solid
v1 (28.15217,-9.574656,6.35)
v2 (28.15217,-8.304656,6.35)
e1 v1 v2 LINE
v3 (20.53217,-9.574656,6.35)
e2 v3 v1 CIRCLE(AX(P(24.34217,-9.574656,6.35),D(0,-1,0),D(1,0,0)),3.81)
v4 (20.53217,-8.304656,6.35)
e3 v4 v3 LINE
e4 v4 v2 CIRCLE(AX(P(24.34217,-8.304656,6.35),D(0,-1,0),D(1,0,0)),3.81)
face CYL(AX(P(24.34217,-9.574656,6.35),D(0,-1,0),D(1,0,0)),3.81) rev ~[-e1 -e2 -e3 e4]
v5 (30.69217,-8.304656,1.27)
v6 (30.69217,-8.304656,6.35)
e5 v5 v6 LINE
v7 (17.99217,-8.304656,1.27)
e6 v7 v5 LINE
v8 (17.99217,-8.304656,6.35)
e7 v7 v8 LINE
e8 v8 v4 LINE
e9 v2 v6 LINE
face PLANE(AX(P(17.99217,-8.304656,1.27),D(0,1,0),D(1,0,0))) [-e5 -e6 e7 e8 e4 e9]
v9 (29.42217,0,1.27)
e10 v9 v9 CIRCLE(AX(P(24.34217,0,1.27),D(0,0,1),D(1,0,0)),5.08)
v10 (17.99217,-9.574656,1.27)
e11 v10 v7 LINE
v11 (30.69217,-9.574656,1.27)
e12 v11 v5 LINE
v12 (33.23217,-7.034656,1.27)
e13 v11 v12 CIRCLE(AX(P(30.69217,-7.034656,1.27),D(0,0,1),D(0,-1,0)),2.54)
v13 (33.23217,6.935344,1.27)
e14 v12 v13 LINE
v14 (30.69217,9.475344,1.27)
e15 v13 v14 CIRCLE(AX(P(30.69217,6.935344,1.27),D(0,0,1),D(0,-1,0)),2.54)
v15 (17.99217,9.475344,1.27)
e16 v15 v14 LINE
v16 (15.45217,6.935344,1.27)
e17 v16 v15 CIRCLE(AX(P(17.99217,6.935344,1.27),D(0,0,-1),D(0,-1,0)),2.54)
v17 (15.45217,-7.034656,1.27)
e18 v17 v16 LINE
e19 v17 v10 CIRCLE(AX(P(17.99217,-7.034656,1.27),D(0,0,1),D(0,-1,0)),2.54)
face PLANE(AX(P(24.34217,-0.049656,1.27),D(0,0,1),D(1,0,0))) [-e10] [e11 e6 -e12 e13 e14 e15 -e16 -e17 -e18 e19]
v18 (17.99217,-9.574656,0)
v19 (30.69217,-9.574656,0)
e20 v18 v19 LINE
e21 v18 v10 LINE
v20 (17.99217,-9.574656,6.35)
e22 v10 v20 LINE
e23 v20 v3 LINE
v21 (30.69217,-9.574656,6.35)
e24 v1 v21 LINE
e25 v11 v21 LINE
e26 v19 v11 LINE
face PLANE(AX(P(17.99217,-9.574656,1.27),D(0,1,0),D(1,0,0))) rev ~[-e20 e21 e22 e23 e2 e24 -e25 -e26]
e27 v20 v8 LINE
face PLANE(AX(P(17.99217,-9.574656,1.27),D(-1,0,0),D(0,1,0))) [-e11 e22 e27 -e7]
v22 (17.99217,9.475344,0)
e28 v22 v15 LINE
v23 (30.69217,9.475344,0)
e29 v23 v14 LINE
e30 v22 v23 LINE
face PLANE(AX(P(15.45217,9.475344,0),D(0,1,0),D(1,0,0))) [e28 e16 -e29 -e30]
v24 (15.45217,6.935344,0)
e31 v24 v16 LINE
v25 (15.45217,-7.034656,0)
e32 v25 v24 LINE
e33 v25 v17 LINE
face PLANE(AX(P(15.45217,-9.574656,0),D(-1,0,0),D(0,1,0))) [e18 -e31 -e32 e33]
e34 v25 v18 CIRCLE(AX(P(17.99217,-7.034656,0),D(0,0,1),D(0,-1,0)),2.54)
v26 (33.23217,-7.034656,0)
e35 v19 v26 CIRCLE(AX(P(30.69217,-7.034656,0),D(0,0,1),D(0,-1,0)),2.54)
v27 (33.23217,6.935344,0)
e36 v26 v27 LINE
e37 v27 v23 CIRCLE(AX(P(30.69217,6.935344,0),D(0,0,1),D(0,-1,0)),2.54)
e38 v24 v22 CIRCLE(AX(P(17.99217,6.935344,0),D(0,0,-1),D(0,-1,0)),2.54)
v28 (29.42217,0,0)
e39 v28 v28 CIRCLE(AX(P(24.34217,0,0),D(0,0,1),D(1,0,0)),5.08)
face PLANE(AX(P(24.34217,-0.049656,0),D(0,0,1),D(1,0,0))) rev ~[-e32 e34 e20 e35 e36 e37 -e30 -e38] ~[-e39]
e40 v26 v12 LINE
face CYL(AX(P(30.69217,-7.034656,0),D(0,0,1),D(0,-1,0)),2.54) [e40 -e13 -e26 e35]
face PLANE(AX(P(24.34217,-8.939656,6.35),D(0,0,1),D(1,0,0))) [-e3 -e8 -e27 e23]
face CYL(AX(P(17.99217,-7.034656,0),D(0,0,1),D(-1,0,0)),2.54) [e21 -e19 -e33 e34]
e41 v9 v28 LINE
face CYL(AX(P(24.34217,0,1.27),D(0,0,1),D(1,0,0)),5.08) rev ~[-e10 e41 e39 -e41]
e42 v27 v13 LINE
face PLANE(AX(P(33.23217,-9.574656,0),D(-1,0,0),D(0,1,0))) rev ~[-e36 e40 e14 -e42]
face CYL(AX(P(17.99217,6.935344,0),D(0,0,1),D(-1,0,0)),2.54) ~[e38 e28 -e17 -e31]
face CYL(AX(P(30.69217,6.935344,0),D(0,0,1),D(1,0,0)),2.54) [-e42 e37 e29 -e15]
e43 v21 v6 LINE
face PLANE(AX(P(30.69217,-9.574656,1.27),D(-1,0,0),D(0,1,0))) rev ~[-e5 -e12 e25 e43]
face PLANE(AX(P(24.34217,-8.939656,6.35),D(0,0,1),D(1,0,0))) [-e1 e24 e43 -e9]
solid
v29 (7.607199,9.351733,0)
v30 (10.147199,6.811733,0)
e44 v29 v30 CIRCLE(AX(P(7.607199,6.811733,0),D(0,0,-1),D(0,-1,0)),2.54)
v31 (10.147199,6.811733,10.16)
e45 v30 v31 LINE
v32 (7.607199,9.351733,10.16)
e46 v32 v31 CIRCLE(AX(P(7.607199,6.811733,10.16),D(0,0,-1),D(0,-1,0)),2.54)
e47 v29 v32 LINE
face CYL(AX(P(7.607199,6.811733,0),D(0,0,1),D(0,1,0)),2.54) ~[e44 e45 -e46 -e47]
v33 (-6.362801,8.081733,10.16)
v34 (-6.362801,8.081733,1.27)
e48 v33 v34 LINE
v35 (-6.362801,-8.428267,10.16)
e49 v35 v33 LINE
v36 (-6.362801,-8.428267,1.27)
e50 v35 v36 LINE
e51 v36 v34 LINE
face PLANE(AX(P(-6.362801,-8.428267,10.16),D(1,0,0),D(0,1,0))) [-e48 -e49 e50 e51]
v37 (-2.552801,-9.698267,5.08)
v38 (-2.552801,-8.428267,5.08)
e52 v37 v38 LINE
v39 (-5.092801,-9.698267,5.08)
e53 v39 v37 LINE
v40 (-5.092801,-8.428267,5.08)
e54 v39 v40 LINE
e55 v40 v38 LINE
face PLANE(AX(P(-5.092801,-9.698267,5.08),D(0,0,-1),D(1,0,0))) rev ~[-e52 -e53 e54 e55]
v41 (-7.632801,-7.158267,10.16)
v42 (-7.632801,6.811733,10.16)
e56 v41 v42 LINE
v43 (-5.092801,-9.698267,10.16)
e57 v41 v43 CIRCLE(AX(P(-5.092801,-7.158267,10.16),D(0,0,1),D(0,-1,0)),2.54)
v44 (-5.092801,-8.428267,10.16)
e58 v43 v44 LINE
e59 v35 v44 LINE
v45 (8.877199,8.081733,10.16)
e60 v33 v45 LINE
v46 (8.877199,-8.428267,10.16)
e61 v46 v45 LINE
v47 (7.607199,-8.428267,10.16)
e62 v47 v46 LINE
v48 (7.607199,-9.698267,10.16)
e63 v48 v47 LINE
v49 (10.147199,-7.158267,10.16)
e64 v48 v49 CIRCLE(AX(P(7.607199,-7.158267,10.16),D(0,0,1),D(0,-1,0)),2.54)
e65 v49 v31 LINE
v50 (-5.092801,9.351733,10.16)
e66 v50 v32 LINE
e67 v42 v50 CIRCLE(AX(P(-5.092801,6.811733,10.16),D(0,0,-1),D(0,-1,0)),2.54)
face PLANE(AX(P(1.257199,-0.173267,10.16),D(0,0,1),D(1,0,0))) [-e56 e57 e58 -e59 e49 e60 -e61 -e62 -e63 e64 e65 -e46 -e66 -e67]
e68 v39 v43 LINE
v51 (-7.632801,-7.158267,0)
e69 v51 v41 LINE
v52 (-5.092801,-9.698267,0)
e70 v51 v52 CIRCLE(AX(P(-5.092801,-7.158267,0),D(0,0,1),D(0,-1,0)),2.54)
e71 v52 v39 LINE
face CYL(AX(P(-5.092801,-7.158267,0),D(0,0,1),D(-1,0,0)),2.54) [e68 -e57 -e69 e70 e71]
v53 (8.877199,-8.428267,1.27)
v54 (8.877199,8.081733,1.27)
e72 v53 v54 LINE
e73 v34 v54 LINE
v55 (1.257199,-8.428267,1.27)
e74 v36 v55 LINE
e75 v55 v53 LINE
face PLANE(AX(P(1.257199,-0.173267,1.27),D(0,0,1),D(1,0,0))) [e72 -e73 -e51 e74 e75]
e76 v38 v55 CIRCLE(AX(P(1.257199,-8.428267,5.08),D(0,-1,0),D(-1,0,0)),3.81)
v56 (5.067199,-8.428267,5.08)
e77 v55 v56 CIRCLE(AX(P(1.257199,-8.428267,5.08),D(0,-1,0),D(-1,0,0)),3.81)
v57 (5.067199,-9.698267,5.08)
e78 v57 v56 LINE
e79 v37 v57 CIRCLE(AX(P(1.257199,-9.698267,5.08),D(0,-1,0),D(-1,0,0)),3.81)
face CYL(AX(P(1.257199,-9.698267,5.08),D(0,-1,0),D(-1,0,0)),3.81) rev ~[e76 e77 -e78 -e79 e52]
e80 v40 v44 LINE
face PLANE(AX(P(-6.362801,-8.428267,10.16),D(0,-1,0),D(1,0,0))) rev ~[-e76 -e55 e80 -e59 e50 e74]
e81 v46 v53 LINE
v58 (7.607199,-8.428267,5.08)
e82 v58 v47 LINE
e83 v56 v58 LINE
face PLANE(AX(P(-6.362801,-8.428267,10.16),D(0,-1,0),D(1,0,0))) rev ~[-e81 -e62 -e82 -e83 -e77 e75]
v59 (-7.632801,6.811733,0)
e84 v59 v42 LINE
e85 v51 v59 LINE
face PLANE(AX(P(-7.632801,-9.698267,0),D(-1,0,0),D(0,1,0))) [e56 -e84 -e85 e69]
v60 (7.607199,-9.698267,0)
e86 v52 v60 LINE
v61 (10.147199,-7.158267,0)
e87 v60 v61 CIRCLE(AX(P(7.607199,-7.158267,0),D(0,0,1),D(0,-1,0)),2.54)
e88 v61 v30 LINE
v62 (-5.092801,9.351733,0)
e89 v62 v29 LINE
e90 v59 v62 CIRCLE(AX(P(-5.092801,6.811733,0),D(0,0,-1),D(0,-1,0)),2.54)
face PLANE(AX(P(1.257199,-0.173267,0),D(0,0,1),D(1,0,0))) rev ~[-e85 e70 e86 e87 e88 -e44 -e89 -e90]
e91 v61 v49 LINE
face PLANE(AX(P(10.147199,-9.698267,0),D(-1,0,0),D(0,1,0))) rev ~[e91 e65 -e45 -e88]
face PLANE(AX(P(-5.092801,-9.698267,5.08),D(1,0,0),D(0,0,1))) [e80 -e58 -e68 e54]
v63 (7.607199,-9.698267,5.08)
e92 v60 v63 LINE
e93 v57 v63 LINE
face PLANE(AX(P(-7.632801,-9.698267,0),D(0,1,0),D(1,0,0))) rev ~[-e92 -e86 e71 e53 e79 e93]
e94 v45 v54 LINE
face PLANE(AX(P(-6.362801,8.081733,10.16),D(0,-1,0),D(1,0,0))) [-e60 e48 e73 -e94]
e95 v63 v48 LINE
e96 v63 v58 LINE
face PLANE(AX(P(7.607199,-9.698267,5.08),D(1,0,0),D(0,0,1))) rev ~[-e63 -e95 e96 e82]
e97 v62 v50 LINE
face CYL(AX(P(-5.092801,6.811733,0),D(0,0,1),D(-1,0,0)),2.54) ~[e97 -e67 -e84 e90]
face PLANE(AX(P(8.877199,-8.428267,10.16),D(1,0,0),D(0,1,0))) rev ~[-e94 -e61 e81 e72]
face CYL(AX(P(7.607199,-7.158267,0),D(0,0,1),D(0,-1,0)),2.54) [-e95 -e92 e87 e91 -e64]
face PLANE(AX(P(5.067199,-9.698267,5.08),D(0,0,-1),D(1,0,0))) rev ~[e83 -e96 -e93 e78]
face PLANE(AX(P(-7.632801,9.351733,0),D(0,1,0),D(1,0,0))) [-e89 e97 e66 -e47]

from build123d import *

# Parameters (mm, degrees)
F0_W      = 17.78
F0_H      = 19.05
F1_DEPTH  = 10.16
F2_W      = 15.24
F2_H      = 16.51
F3_DEPTH  = 8.89
F4_R      = 2.54
F5_W      = 2.54
F5_H      = 5.08
F6_DEPTH  = 1.27
F7_W      = 17.78
F7_H      = 19.05
F8_DEPTH  = 1.27
F9_R      = 2.54
F10_W     = 12.7
F10_H     = 1.27
F11_DEPTH = 5.08
F12_R     = 3.81
F13_DEPTH = 1.27
F14_R     = 5.08
F15_DEPTH = 1.27


# Not quite as in the source:
# - a feature names something its author has since deleted; it is built from what else it names


with BuildPart() as f1:
    # F0 (on Top) → F1 (new body)
    with BuildSketch(Plane.XY):
        with Locations((1.2571994369, -0.1732670812)):
            Rectangle(F0_W, F0_H)
    extrude(amount=F1_DEPTH)

    # F2 (on face) → F3 (cut)
    with BuildSketch(Plane.XY.offset(10.16)):
        with Locations((1.2571994369, -0.1732670812)):
            Rectangle(F2_W, F2_H)
    extrude(amount=-F3_DEPTH, mode=Mode.SUBTRACT)

    # F4
    f4_edges = [f1.edges().sort_by_distance(p)[0] for p in [
        (10.147199, 9.351733, 5.08),
        (-7.632801, 9.351733, 5.08),
        (-7.632801, -9.698267, 5.08),
        (10.147199, -9.698267, 5.08),
    ]]
    fillet(f4_edges, radius=F4_R)

    # F5 (on face) → F6 (cut)
    with BuildSketch(Plane.XZ.offset(9.6982670812)):
        with BuildLine():
            ThreePointArc((-2.5528005631, 5.08), (1.2571994369, 1.27), (5.0671994369, 5.08))
            ThreePointArc((5.0671994369, 5.08), (1.2571994369, 8.89), (-2.5528005631, 5.08))
        make_face()
        with Locations((-3.8228005631, 7.62)):
            Rectangle(F5_W, F5_H)
        with Locations((6.3371994369, 7.62)):
            Rectangle(F5_W, F5_H)
        with BuildLine():
            ThreePointArc((-2.5528005631, 5.08), (1.2571994369, 8.89), (5.0671994369, 5.08))
            Line((5.0671994369, 5.08), (5.0671994369, 10.16))
            Line((5.0671994369, 10.16), (-2.5528005631, 10.16))
            Line((-2.5528005631, 10.16), (-2.5528005631, 5.08))
        make_face()
    extrude(amount=-F6_DEPTH, mode=Mode.SUBTRACT)


with BuildPart() as f8:
    # F7 (on Top) → F8 (new body)
    with BuildSketch(Plane.XY):
        with Locations((24.3421698132, -0.0496563748)):
            Rectangle(F7_W, F7_H)
    extrude(amount=F8_DEPTH)

    # F9
    f9_edges = [f8.edges().sort_by_distance(p)[0] for p in [
        (15.45217, -9.574656, 0.635),
        (33.23217, -9.574656, 0.635),
        (33.23217, 9.475344, 0.635),
        (15.45217, 9.475344, 0.635),
    ]]
    fillet(f9_edges, radius=F9_R)

    # F10 (on face) → F11 (join)
    with BuildSketch(Plane.XY.offset(1.27)):
        with Locations((24.3421698132, -8.9396563748)):
            Rectangle(F10_W, F10_H)
    extrude(amount=F11_DEPTH)

    # F12 (on face) → F13 (cut)
    with BuildSketch(Plane.XZ.offset(9.5746563748)):
        with Locations((24.3421698132, 6.35)):
            Circle(F12_R)
    extrude(amount=-F13_DEPTH, mode=Mode.SUBTRACT)

    # F14 (on face) → F15 (cut)
    with BuildSketch(Plane.XY.offset(1.27)):
        with Locations((24.3421698132, 0)):
            Circle(F14_R)
    extrude(amount=-F15_DEPTH, mode=Mode.SUBTRACT)


solid = Compound([f1.part, f8.part])
